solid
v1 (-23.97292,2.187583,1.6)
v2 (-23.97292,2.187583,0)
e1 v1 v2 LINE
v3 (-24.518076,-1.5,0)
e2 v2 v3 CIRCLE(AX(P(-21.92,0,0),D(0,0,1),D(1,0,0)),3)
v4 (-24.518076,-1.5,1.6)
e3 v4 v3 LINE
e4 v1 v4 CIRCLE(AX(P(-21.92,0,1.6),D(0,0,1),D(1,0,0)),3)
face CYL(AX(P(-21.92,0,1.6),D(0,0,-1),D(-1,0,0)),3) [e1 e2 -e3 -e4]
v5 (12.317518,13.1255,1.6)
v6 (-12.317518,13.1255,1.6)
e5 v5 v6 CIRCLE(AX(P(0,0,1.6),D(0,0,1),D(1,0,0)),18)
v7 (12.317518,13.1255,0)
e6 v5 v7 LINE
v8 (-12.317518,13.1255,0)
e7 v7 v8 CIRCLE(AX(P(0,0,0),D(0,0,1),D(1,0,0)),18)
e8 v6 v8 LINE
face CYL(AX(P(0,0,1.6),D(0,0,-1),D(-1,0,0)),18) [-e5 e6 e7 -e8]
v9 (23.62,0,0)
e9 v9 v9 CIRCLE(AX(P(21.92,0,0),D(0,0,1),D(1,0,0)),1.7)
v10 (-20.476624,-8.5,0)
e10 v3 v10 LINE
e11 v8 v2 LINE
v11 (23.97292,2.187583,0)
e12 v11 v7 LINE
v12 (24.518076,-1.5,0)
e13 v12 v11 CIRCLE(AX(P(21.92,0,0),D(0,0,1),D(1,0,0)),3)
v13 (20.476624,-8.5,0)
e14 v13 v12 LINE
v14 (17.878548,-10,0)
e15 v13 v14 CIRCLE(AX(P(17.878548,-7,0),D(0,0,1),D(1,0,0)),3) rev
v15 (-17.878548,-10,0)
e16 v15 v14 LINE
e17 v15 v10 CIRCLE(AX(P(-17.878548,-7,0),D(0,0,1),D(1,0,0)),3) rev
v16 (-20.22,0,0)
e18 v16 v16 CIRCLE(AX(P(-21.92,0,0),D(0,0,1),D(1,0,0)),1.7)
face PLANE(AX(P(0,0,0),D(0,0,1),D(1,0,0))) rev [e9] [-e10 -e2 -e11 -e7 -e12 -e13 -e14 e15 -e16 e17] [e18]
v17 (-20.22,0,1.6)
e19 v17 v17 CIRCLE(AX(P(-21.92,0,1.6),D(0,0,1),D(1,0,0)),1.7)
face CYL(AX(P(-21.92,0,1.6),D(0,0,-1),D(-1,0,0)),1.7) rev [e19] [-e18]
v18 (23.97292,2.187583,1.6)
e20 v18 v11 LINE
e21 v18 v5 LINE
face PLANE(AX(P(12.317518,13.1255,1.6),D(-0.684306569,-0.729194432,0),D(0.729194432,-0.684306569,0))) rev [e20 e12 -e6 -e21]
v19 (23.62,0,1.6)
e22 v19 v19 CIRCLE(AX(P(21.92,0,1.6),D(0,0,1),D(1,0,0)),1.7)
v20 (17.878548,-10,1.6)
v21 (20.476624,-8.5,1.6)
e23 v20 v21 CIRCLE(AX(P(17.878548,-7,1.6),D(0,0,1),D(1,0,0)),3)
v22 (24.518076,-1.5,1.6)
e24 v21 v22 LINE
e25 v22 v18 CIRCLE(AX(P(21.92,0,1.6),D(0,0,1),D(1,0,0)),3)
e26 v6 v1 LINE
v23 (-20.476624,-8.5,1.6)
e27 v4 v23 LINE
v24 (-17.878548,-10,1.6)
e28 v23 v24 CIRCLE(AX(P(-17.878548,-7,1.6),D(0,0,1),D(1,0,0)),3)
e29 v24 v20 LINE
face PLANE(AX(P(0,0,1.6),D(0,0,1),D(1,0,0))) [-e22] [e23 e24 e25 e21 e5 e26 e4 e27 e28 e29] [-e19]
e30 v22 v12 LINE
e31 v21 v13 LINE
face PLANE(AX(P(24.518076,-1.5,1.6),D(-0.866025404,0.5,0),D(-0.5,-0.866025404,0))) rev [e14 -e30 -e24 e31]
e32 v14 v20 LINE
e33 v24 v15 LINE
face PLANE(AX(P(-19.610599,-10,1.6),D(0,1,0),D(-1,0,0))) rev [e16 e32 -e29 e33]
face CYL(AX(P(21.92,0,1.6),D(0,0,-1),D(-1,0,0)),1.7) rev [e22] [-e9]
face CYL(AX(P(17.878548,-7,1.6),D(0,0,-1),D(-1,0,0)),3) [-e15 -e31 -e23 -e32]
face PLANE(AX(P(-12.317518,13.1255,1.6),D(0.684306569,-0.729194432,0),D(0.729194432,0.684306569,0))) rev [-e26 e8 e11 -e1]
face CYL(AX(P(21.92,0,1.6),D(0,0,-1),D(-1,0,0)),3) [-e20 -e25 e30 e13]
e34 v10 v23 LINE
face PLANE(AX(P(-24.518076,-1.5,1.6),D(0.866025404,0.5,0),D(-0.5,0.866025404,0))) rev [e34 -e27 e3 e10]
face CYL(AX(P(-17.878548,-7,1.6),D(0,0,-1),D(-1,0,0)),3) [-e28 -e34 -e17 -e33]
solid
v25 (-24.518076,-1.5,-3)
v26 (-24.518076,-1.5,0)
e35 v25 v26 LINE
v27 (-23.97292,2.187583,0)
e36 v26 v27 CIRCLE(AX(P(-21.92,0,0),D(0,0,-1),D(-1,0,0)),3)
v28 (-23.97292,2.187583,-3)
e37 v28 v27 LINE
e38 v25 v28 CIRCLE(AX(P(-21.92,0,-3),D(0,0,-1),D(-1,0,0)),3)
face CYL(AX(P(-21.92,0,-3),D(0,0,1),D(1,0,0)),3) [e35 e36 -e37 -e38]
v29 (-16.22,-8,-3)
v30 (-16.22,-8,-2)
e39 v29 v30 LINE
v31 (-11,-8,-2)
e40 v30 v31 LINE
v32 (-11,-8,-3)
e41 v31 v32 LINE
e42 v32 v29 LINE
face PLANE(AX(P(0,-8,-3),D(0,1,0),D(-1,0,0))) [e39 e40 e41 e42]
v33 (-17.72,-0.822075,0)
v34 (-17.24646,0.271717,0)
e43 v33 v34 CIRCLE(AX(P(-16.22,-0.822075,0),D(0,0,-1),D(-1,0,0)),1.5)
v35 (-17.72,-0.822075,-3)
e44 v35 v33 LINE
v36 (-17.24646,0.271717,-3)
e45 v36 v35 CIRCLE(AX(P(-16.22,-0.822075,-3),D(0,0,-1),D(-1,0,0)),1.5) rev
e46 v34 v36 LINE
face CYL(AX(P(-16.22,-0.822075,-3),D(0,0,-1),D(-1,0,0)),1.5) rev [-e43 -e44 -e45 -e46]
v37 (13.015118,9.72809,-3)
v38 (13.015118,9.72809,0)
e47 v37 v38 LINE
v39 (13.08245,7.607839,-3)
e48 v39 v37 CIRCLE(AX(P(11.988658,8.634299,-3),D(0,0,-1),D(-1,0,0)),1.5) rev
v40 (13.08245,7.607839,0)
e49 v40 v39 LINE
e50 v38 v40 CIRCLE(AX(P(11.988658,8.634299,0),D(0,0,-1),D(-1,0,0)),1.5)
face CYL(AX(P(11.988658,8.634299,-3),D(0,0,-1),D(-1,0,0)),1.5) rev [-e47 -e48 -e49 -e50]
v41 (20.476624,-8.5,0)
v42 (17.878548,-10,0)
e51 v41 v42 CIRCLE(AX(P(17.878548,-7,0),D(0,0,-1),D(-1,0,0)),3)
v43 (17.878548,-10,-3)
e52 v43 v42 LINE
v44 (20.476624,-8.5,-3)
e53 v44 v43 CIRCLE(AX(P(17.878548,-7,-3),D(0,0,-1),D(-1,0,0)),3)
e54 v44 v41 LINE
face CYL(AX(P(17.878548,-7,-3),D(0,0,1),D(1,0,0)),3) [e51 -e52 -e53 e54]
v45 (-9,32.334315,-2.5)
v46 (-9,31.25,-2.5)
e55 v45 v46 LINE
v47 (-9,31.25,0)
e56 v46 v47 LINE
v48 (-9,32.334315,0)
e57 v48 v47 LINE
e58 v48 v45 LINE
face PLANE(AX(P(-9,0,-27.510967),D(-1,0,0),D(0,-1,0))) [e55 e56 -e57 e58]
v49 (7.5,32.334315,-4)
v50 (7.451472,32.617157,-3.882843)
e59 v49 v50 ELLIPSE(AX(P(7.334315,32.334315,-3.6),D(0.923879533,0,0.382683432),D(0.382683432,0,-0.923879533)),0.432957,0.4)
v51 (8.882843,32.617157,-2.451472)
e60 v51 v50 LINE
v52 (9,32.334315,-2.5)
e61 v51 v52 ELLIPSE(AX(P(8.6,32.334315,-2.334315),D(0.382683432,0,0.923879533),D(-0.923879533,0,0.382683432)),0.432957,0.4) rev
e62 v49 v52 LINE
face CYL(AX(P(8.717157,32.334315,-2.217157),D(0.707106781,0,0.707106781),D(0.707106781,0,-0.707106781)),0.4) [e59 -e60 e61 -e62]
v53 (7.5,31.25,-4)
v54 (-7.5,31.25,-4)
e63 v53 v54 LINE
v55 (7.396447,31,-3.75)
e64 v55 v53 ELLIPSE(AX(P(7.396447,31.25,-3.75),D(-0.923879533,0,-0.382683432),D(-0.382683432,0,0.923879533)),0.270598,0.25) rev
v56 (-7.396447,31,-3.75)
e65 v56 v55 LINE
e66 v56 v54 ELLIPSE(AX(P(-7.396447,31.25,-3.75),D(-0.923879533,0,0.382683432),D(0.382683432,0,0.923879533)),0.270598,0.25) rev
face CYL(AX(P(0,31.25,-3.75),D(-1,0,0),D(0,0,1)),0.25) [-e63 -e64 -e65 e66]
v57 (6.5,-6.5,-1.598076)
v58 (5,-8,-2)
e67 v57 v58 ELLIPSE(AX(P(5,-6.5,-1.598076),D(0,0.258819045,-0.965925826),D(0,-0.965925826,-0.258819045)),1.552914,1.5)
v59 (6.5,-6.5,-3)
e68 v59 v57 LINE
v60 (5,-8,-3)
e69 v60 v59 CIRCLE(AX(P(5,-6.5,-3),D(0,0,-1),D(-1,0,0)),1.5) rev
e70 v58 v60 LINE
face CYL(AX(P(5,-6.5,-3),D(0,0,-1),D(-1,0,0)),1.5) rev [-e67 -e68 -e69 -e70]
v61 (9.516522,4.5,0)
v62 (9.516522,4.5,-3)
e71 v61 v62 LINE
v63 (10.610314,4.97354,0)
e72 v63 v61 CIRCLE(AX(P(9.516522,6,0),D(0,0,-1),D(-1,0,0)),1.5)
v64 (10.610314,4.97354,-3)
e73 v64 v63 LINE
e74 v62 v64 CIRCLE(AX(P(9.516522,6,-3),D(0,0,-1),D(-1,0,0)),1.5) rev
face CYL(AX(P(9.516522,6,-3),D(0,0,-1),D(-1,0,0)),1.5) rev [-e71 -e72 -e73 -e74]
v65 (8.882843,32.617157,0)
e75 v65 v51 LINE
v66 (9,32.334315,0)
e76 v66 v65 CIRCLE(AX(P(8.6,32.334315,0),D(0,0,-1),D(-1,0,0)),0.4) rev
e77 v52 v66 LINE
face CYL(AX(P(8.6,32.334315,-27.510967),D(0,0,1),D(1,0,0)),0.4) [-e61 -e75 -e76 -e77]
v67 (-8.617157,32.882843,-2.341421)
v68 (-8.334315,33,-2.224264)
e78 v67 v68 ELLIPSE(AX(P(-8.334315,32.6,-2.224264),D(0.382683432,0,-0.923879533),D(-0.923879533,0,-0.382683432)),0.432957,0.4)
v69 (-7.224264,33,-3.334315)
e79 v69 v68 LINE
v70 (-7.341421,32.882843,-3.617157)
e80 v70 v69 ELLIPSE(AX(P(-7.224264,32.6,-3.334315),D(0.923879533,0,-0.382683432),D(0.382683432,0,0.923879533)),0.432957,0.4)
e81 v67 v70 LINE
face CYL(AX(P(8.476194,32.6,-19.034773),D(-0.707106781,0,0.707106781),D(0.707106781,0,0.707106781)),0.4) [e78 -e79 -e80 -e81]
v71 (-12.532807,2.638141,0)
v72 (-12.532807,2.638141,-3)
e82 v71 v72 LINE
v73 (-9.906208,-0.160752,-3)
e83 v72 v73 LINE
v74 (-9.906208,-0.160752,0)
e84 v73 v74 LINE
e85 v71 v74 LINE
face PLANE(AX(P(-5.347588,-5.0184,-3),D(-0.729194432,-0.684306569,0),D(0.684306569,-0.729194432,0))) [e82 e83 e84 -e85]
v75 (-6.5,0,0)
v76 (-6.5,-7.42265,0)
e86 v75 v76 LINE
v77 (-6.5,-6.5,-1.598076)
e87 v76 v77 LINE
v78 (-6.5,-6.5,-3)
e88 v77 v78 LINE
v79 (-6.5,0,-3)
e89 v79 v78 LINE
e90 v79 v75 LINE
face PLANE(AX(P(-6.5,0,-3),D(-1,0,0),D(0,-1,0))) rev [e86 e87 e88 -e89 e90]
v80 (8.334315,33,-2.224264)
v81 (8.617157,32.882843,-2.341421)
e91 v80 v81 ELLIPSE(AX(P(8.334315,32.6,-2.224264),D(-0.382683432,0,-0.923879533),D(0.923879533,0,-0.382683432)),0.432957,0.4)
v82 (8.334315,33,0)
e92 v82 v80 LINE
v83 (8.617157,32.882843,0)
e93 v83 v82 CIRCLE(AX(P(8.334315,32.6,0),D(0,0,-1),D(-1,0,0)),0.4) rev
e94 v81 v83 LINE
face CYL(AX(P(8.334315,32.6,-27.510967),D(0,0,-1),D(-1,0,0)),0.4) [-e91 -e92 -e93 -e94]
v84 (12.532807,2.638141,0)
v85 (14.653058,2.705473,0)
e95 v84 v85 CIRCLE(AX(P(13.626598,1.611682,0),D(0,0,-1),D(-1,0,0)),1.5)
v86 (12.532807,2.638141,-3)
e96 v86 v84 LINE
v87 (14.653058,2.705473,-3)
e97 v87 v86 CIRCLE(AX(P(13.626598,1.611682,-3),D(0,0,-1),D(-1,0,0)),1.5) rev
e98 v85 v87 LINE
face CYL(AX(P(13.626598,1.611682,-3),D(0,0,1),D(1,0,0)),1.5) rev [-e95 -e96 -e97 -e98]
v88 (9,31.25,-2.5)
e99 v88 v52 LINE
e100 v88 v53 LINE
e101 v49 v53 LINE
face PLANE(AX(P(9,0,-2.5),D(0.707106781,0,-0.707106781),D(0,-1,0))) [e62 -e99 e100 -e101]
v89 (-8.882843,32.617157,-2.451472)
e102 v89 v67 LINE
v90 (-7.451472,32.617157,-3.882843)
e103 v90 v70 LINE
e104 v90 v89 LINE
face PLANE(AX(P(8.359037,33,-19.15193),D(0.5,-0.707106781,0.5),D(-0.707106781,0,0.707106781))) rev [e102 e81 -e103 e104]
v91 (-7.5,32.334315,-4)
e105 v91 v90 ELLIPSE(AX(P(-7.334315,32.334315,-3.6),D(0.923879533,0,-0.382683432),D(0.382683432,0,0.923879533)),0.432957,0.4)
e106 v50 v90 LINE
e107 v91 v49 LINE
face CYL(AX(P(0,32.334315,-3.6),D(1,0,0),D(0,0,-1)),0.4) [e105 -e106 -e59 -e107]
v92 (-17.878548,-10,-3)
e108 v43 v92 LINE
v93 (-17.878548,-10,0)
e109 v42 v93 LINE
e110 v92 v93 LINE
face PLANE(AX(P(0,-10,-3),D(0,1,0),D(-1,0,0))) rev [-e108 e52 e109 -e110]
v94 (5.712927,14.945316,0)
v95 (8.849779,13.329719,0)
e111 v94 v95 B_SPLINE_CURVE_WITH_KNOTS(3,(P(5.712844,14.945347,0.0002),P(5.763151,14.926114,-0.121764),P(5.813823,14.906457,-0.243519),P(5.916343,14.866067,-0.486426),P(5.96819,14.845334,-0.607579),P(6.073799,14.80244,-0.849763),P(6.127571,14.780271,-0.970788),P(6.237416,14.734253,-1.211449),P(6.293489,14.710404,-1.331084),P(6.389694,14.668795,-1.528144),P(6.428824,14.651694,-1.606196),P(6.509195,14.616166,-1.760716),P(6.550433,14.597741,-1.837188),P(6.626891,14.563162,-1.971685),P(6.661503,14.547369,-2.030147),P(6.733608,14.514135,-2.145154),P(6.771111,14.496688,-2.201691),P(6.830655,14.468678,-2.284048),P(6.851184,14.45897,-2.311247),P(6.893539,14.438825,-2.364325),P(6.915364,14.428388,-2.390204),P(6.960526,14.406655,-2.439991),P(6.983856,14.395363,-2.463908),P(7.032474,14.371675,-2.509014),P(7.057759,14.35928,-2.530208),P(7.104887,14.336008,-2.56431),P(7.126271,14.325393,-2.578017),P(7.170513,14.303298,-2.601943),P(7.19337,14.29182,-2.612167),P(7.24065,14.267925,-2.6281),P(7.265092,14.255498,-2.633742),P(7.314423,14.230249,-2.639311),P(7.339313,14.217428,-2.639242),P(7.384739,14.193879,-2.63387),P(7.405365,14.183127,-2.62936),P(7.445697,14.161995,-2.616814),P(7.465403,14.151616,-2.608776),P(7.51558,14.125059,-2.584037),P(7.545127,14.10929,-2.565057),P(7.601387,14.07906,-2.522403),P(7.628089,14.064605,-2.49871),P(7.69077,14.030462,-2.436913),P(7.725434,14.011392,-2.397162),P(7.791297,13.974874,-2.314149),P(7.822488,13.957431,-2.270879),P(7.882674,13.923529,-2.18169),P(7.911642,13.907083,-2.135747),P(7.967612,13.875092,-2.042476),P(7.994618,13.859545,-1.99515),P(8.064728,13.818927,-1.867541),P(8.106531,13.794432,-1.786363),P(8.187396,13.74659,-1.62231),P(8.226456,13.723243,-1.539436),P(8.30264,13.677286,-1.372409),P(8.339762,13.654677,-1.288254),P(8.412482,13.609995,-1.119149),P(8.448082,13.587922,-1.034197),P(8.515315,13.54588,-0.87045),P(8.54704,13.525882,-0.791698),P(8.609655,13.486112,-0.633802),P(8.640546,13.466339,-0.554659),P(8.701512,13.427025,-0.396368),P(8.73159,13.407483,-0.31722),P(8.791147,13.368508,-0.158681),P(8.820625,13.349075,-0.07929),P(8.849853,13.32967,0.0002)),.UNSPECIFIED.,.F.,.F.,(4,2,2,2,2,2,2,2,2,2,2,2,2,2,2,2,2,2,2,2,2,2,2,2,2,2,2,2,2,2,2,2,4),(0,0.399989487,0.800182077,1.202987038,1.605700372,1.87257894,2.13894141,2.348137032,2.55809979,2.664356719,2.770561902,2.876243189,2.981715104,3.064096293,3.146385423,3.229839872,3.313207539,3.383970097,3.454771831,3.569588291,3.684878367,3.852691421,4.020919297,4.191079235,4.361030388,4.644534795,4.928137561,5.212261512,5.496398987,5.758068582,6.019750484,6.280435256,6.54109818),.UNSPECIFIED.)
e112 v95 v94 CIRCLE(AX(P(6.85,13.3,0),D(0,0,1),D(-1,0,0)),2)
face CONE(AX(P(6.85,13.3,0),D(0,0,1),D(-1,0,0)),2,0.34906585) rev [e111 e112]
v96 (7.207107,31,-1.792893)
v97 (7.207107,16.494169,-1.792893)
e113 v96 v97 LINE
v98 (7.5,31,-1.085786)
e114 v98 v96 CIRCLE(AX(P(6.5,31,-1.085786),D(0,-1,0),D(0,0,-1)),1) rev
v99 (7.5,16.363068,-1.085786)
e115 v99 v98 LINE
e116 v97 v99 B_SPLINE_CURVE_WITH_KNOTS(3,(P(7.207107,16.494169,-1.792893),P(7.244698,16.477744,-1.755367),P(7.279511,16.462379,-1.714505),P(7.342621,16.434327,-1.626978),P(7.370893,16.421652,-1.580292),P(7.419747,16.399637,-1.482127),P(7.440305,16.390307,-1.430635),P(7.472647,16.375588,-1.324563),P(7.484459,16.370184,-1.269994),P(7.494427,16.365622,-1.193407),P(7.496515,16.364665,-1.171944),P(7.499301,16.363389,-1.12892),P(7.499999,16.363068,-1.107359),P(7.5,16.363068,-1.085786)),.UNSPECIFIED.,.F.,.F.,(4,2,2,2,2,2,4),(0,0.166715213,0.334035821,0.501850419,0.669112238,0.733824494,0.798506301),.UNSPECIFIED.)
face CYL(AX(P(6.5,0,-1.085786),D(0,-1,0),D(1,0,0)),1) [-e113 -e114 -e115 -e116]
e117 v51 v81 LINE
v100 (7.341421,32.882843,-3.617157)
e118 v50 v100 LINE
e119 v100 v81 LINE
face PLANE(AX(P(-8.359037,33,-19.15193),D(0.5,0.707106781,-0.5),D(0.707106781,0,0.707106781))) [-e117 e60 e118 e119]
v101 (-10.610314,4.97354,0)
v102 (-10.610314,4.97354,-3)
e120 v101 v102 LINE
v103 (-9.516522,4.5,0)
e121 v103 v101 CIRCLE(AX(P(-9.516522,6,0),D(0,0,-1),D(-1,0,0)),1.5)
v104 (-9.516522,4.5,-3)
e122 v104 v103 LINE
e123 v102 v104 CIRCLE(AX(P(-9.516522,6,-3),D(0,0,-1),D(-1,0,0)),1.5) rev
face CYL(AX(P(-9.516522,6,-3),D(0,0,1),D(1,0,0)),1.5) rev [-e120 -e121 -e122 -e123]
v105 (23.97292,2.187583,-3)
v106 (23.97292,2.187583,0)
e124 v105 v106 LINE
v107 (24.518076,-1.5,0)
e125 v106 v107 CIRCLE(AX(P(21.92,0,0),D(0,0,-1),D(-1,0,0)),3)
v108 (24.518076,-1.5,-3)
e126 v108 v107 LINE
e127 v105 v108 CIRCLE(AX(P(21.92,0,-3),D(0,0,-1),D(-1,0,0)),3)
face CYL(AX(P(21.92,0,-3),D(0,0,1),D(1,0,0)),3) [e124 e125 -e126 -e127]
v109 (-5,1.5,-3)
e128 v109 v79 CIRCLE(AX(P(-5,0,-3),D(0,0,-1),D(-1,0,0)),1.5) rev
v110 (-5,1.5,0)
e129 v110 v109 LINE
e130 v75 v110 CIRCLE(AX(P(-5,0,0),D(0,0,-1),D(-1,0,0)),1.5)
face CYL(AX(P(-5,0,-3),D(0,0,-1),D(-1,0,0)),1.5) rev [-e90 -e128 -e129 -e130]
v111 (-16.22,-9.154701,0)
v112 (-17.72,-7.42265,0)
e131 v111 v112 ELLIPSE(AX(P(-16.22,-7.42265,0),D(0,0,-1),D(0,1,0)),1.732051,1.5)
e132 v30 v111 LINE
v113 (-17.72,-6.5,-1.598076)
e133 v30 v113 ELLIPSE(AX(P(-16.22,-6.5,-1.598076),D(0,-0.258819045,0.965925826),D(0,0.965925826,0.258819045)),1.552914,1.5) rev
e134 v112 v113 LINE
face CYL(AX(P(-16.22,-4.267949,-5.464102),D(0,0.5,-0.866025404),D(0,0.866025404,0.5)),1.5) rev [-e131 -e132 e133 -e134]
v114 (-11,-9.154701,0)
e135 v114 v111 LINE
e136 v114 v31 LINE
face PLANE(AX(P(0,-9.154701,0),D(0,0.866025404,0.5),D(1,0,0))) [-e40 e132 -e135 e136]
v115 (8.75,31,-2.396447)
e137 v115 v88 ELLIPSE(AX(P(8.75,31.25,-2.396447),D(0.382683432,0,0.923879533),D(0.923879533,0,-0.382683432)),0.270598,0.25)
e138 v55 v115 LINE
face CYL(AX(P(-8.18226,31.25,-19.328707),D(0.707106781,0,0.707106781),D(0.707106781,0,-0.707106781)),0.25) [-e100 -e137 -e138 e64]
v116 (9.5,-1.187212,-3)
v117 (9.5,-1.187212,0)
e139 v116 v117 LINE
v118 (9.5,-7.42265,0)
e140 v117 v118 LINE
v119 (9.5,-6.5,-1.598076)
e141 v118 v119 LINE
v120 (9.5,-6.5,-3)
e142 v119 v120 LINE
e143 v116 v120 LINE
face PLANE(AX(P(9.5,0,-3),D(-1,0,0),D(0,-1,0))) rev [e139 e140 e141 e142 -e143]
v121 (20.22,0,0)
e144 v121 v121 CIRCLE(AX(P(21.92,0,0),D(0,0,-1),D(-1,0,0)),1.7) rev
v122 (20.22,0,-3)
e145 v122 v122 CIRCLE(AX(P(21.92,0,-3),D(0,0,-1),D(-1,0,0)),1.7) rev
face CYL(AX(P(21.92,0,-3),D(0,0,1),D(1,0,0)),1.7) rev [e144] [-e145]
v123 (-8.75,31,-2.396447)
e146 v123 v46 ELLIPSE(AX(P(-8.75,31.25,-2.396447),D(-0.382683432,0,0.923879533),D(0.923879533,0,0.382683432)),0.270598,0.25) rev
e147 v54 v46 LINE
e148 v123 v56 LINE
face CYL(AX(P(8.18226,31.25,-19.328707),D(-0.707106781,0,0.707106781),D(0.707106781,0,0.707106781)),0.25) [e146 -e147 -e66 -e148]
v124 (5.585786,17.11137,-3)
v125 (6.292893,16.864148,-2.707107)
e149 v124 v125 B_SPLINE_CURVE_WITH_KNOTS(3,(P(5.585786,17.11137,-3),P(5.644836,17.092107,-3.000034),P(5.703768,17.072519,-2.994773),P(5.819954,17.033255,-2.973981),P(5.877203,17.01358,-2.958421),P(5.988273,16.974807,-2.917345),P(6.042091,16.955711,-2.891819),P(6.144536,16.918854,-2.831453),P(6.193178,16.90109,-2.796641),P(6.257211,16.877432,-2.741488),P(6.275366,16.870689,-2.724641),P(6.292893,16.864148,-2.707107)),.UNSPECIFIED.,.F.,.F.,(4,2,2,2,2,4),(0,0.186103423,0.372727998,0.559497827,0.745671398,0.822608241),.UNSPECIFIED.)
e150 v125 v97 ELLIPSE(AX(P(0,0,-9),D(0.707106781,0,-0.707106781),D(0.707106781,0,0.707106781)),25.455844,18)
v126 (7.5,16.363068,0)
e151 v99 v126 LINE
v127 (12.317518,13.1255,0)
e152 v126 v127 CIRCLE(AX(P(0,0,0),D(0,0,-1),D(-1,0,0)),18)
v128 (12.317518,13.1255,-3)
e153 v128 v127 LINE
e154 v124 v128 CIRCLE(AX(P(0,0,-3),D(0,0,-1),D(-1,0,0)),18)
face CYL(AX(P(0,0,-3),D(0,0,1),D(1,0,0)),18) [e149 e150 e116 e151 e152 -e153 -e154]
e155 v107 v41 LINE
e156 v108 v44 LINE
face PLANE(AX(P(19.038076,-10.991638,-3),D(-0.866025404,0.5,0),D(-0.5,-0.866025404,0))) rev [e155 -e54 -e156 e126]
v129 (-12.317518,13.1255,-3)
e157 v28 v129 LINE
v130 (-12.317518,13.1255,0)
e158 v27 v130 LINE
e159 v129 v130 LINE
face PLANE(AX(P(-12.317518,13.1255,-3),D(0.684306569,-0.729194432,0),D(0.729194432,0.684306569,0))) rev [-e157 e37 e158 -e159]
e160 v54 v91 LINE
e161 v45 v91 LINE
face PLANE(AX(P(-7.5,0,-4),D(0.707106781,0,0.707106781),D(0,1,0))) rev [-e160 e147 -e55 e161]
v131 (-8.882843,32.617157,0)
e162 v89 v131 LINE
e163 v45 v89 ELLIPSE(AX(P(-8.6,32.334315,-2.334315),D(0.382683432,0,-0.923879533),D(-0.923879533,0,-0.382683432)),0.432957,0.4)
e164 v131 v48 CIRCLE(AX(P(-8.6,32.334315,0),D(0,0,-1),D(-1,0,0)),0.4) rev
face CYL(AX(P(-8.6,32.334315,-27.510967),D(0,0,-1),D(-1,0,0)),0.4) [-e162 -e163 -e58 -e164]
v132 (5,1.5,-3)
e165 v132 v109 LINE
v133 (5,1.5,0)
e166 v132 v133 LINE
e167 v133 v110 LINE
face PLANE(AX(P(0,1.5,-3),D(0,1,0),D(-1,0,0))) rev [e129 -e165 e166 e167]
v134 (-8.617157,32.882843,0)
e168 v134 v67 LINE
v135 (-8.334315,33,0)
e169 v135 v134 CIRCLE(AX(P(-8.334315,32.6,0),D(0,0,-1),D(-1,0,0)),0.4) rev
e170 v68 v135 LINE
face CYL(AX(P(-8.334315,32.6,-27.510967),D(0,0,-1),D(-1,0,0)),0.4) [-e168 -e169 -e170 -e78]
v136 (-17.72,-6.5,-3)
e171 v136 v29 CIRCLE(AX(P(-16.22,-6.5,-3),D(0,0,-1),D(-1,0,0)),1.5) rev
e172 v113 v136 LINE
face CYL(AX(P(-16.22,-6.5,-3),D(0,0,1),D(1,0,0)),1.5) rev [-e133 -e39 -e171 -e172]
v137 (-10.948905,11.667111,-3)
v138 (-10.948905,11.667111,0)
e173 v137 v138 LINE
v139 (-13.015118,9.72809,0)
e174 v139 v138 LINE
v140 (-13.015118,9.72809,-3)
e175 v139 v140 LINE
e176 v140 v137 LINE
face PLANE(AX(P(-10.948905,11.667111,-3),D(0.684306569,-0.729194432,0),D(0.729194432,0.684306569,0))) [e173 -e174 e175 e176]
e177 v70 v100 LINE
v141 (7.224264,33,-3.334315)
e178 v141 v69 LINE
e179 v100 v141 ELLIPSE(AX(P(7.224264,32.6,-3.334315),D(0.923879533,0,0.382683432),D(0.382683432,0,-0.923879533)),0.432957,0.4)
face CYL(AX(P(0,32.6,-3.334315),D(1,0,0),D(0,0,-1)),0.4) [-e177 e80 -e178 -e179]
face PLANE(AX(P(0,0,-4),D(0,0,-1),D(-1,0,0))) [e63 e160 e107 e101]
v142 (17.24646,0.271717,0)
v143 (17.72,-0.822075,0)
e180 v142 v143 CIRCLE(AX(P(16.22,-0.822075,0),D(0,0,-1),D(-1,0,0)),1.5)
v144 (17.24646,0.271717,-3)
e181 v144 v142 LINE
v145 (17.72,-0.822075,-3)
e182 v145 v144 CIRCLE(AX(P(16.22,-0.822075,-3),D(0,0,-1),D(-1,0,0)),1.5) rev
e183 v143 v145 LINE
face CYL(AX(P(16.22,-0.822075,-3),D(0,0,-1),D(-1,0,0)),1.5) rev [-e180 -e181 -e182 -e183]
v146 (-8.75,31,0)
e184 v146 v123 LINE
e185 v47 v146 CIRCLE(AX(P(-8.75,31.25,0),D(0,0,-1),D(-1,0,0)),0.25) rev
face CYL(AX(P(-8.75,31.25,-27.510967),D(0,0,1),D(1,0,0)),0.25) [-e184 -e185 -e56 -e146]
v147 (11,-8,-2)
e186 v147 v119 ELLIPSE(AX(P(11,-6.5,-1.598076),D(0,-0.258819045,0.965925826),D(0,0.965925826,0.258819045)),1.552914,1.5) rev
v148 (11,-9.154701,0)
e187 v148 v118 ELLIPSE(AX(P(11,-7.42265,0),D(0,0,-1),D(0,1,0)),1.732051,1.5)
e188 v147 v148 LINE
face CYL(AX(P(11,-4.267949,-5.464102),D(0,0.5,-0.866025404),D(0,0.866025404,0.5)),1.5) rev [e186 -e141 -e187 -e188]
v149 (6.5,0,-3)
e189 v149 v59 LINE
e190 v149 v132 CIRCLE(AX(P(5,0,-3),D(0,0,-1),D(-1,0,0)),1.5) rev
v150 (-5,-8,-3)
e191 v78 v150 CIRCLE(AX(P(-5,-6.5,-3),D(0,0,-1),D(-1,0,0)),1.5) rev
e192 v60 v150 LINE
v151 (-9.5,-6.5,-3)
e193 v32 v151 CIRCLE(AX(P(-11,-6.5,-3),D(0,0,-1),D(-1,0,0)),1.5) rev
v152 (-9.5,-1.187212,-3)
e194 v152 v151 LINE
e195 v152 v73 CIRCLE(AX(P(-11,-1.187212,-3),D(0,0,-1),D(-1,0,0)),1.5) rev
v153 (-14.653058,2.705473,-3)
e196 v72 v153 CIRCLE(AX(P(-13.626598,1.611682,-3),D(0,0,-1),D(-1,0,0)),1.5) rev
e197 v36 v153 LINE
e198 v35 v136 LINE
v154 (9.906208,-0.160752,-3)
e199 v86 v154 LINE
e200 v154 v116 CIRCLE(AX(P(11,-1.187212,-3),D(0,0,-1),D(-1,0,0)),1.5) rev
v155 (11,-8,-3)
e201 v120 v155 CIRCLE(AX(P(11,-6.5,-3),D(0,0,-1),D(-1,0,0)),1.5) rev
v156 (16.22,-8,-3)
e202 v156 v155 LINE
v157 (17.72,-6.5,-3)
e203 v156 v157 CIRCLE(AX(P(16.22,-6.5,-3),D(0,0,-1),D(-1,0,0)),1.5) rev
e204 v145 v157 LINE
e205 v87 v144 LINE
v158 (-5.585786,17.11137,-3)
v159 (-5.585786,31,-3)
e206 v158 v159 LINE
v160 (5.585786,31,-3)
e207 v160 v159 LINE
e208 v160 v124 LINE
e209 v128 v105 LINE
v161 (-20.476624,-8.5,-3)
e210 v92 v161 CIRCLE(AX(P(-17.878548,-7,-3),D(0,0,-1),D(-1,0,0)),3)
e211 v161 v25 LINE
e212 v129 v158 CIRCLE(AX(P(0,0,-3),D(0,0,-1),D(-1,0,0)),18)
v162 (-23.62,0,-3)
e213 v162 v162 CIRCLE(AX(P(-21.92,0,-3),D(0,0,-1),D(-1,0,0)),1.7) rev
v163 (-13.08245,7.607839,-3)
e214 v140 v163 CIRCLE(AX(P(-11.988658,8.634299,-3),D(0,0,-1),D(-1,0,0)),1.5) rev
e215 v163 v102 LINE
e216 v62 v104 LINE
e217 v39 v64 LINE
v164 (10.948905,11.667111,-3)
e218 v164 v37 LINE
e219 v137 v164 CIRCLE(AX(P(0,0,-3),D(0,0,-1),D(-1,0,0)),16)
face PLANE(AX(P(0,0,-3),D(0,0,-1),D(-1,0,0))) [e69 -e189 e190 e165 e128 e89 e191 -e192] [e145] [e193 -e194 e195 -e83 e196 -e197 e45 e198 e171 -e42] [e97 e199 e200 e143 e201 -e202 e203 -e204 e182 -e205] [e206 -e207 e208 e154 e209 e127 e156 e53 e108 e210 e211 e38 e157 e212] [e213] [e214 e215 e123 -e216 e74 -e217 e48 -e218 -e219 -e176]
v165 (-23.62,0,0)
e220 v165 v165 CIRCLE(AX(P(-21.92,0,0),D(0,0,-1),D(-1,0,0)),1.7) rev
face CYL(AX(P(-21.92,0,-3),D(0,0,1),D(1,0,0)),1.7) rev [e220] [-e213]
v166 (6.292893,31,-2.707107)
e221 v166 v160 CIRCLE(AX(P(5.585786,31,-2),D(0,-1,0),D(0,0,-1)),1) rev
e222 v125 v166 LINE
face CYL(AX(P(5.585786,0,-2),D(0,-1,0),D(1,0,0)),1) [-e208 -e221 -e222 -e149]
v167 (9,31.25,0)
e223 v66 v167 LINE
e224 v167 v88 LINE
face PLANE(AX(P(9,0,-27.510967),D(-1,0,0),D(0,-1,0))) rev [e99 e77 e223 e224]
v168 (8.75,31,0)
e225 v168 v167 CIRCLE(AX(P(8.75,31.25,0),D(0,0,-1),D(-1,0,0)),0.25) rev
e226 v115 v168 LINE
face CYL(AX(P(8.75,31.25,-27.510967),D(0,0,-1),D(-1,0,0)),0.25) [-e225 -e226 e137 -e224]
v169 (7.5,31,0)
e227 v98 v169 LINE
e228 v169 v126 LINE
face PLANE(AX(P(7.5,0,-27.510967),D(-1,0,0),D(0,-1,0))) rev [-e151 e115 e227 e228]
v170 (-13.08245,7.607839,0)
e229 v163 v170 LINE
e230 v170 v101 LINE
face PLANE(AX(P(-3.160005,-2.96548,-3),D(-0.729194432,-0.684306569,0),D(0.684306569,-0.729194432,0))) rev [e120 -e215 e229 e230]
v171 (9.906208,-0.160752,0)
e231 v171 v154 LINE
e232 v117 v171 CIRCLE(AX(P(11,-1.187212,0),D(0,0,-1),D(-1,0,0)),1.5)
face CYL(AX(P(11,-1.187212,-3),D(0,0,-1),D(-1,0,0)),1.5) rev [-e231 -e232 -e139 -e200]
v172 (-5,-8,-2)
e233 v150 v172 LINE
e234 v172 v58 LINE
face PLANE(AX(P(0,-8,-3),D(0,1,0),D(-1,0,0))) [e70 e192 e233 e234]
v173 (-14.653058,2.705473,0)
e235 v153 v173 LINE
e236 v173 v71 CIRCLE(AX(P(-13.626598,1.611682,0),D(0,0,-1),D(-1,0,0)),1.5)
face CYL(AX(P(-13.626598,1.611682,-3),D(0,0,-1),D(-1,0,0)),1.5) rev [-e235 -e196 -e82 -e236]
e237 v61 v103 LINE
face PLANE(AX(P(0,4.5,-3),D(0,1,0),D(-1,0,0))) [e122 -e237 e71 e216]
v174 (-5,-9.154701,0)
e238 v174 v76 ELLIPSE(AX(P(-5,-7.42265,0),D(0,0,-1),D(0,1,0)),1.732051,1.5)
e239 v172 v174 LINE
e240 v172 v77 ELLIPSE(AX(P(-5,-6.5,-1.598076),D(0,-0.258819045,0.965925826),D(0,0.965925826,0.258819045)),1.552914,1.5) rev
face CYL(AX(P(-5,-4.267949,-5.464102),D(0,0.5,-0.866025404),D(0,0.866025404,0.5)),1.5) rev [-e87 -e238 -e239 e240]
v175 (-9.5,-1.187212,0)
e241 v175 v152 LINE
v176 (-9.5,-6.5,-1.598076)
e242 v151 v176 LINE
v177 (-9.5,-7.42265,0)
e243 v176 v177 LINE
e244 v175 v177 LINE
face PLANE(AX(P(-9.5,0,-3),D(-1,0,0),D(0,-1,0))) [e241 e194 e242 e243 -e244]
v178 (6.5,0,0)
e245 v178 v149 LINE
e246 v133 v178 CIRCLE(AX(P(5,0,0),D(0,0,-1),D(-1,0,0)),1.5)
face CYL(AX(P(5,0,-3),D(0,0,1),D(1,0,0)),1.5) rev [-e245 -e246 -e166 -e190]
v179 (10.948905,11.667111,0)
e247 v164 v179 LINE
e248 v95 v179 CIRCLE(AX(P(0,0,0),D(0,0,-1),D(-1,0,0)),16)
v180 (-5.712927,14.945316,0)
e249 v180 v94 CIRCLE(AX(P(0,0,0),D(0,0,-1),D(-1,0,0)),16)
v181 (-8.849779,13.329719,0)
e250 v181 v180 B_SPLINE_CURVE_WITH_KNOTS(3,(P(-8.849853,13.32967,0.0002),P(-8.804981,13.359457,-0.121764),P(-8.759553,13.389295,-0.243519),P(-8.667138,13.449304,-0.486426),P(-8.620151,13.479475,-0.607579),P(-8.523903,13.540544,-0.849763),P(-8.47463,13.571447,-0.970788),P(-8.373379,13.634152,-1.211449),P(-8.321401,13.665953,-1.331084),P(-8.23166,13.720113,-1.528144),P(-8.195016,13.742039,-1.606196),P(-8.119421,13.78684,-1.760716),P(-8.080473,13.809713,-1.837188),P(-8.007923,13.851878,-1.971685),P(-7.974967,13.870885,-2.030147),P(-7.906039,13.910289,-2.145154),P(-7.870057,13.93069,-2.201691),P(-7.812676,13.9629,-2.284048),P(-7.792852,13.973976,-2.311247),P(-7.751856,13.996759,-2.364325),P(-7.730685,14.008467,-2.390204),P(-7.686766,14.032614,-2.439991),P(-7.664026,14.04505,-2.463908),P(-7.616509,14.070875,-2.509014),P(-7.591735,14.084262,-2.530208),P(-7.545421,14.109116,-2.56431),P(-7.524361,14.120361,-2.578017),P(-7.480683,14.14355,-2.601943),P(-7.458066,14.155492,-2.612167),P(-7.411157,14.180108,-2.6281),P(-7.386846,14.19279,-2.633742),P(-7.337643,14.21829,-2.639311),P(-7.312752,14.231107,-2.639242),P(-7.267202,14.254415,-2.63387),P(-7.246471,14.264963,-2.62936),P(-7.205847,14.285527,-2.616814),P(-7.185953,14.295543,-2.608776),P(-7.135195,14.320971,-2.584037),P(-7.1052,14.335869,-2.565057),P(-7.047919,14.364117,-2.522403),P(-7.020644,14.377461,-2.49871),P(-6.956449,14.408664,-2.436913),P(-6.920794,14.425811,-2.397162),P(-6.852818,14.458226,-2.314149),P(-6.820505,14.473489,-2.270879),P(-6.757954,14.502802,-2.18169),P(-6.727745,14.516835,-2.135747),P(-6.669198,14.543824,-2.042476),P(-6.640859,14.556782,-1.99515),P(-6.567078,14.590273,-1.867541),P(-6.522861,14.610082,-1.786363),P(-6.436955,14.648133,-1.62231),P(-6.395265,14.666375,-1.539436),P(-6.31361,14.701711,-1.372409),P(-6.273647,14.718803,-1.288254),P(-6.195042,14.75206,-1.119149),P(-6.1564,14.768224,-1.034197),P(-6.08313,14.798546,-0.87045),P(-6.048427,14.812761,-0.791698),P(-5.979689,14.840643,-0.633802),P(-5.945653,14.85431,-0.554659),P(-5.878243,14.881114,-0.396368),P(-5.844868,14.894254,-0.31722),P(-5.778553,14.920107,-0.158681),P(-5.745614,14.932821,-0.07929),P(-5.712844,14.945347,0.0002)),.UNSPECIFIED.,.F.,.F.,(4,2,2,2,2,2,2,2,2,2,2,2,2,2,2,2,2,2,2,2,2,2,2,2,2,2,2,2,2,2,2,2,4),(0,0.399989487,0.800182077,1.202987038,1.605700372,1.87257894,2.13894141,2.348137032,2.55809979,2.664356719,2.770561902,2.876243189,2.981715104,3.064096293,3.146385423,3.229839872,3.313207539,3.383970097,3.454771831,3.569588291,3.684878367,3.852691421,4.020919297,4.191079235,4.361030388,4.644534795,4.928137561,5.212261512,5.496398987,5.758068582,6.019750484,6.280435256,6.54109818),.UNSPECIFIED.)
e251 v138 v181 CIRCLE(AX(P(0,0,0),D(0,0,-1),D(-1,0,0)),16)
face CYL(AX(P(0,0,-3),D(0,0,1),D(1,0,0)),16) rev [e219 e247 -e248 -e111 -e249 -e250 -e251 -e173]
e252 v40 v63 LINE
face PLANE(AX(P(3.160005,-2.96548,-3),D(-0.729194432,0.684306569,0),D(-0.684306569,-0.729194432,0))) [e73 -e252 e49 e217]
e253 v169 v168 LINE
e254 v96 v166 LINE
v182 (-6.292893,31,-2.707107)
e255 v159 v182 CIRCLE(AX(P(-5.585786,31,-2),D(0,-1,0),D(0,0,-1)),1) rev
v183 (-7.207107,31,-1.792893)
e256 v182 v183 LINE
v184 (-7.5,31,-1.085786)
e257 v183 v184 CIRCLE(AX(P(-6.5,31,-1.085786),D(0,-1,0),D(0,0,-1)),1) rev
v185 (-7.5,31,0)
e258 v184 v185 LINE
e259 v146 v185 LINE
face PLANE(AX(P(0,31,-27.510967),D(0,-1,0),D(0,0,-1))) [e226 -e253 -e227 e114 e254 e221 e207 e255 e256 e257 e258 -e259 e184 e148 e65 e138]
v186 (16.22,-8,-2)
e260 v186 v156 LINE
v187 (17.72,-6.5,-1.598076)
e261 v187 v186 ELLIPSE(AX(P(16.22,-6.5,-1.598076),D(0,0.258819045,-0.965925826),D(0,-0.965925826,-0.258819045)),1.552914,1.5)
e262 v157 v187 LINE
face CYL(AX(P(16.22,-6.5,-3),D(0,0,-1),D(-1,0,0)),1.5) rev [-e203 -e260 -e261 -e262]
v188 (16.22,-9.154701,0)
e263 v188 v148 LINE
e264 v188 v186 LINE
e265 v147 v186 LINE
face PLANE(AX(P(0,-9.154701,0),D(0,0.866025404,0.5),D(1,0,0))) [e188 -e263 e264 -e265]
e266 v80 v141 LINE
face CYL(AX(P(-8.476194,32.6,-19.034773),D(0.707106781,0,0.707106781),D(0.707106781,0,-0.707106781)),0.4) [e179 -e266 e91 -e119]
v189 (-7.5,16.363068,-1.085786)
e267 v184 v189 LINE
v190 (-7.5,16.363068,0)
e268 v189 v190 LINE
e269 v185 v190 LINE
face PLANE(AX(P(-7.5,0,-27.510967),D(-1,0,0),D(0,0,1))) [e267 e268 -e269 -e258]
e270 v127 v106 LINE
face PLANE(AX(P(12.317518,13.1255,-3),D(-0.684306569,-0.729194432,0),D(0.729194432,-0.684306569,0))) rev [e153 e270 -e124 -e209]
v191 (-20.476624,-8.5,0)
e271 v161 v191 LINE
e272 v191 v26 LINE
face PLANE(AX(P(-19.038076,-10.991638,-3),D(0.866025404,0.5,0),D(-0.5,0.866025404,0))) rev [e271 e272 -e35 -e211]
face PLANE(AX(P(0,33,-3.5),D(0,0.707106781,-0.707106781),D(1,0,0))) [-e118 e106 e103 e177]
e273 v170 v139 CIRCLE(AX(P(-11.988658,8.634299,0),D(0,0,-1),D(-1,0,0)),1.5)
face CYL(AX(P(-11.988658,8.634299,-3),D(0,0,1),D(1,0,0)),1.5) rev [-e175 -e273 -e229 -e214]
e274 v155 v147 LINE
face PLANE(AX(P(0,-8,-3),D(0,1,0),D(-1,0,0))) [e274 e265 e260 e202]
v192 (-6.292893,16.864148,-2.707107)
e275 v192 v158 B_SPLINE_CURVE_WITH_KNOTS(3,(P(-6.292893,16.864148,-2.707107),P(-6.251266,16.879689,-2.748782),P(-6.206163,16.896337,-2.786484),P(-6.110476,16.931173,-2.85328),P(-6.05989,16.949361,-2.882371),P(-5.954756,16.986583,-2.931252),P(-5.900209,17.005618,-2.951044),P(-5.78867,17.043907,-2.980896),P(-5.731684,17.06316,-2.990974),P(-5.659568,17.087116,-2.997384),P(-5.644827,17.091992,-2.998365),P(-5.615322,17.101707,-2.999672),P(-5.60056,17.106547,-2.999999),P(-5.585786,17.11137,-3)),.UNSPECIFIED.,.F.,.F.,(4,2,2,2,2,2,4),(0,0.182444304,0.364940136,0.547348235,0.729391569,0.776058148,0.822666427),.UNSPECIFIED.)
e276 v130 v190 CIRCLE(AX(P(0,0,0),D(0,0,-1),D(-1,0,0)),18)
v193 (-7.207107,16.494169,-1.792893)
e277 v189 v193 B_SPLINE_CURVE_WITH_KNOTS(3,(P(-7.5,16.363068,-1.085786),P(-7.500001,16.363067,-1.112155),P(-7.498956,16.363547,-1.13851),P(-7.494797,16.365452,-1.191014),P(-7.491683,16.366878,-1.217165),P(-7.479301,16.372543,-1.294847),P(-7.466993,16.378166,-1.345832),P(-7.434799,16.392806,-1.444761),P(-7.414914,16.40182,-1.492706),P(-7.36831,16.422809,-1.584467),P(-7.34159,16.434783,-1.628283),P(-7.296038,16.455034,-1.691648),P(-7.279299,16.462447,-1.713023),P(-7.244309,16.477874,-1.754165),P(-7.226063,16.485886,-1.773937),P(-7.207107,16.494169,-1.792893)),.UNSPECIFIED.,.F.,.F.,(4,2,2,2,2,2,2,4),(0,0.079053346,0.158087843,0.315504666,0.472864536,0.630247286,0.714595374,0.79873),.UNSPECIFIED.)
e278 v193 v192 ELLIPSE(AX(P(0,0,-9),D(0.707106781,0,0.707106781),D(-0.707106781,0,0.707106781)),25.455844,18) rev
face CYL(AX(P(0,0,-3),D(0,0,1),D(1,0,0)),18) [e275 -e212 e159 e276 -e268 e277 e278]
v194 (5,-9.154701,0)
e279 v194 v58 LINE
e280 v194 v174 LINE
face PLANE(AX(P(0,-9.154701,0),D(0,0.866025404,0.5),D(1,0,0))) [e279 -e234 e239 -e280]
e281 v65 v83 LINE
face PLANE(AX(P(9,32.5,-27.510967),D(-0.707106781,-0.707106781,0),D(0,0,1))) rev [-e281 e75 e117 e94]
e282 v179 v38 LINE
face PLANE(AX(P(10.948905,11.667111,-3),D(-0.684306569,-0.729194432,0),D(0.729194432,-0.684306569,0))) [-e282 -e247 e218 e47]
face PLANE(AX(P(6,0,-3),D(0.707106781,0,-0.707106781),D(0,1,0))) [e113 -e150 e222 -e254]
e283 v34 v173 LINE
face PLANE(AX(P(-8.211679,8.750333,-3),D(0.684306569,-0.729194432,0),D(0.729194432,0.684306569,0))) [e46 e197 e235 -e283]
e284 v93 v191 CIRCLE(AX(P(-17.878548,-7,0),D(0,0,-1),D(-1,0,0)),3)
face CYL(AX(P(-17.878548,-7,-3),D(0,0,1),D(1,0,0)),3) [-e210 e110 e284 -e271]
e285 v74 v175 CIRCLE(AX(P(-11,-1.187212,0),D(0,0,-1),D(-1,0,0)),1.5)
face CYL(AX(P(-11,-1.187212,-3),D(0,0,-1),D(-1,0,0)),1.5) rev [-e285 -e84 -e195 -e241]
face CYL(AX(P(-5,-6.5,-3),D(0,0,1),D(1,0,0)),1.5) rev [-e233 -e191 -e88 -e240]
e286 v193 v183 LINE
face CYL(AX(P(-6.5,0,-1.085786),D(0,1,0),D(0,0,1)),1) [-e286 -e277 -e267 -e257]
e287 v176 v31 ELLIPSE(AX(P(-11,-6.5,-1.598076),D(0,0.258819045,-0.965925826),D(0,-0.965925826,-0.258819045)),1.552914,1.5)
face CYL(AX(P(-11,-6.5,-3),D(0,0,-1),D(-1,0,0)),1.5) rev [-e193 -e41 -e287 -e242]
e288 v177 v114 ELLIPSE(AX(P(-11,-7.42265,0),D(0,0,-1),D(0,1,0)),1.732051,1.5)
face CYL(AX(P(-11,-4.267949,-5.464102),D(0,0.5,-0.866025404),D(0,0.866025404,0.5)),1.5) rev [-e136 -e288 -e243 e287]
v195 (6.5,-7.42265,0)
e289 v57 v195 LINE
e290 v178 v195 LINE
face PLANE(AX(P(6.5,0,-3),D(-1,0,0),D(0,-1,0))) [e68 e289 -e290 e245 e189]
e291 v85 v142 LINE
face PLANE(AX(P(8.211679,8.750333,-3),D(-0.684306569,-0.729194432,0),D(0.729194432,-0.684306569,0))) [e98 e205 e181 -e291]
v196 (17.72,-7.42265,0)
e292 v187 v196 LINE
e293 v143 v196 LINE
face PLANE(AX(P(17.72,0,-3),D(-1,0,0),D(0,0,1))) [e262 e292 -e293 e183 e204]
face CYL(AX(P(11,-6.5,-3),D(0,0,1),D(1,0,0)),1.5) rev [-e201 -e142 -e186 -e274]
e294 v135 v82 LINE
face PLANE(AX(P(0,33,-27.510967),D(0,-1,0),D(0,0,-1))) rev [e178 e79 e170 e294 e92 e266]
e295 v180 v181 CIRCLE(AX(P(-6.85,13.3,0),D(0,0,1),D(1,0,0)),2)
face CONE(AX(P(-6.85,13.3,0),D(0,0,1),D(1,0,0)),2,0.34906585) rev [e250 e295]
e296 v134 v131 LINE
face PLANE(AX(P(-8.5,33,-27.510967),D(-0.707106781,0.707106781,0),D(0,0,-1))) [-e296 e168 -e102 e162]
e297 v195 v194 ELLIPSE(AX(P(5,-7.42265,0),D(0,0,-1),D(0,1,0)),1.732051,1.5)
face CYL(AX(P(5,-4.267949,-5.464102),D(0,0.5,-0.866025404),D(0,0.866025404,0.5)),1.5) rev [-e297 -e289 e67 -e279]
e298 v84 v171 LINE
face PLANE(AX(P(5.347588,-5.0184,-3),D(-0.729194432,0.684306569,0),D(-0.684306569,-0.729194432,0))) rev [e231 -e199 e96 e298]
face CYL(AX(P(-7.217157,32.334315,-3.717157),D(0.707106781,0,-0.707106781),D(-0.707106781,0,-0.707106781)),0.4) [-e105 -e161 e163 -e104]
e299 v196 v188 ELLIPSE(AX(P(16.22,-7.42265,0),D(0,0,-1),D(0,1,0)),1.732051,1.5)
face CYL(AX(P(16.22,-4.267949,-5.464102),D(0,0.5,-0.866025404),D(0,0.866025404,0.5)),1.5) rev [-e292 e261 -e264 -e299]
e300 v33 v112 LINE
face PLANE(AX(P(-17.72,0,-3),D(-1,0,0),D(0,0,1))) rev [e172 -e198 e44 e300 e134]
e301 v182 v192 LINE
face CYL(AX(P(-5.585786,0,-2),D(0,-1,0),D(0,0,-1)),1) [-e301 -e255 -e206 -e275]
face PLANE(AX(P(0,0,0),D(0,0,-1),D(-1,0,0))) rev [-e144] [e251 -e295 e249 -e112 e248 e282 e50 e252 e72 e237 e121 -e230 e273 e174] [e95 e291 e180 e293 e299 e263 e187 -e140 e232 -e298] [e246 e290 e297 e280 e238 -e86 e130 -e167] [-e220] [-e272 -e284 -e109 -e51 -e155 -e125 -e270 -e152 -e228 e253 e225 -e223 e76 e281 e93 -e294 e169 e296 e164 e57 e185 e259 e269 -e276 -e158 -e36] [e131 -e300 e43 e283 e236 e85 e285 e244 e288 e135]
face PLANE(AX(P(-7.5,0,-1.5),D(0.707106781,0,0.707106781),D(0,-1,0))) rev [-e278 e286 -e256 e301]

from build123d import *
from OCP.BRepFilletAPI import BRepFilletAPI_MakeChamfer

# Parameters (mm, degrees)
SKETCH1_R           = 1.7
BOSS_EXTRUDE1_DEPTH = 1.6
FILLET3_R           = 3
SKETCH2_R           = 1.7
SKETCH2_W           = 13
SKETCH2_H           = 9.5
BOSS_EXTRUDE2_DEPTH = 3
CHAMFER1_SIZE       = 2
CHAMFER1_SIZE2      = 1.154700538
MOVE_START          = -3
MOVE_FACE2_DEPTH    = 3
MOVE_FACE3_DEPTH    = 3
FILLET2_R           = 1.5
BOSS_EXTRUDE3_START = -3
BOSS_EXTRUDE3_DEPTH = 3
BOSS_EXTRUDE4_START = -3
BOSS_EXTRUDE4_DEPTH = 1
CHAMFER6_SIZE       = 1.5
CHAMFER3_SIZE       = 0.5
FILLET6_R           = 0.4
CHAMFER5_SIZE       = 1.5
FILLET7_R           = 1
FILLET8_R           = 0.25


# Read off the part's stored shape, not the designer's step: Move Face2, Move Face3
with BuildPart() as part:
    # Sketch1 → Boss-Extrude1 (new body)
    with BuildSketch(Plane.XY):
        with BuildLine():
            Line((-12.317518248, 13.12549977), (-23.972919708, 2.187583295))
            ThreePointArc((-23.972919708, 2.187583295), (-24.887744666, 0.438738647), (-24.518076211, -1.5))
            Line((-24.518076211, -1.5), (-19.610598923, -10))
            Line((-19.610598923, -10), (19.610598923, -10))
            Line((19.610598923, -10), (24.518076211, -1.5))
            ThreePointArc((24.518076211, -1.5), (24.887744666, 0.438738647), (23.972919708, 2.187583295))
            Line((23.972919708, 2.187583295), (12.317518248, 13.12549977))
            ThreePointArc((12.317518248, 13.12549977), (0, 18), (-12.317518248, 13.12549977))
        make_face()
        with Locations((-21.92, 0)):
            Circle(SKETCH1_R, mode=Mode.SUBTRACT)
        with Locations((21.92, 0)):
            Circle(SKETCH1_R, mode=Mode.SUBTRACT)
    extrude(amount=BOSS_EXTRUDE1_DEPTH)

    # Fillet3
    fillet3_edges = [part.edges().sort_by_distance(p)[0] for p in [
        (19.610598923, -10, 0.8),
        (-19.610598923, -10, 0.8),
    ]]
    fillet(fillet3_edges, radius=FILLET3_R)


with BuildPart() as body_2:
    # Sketch2 → Boss-Extrude2 (new body)
    with BuildSketch(Plane(origin=(0, 0, 0), x_dir=(-1, 0, 0), z_dir=(0, 0, -1))):
        with BuildLine():
            ThreePointArc((-20.476624327, -8.5), (-19.378548116, -9.598076211), (-17.878548116, -10))
            Line((-17.878548116, -10), (17.878548116, -10))
            ThreePointArc((17.878548116, -10), (19.378548116, -9.598076211), (20.476624327, -8.5))
            Line((20.476624327, -8.5), (24.518076211, -1.5))
            ThreePointArc((24.518076211, -1.5), (24.887744666, 0.438738647), (23.972919708, 2.187583295))
            Line((23.972919708, 2.187583295), (12.317518248, 13.12549977))
            ThreePointArc((12.317518248, 13.12549977), (0, 18), (-12.317518248, 13.12549977))
            Line((-12.317518248, 13.12549977), (-23.972919708, 2.187583295))
            ThreePointArc((-23.972919708, 2.187583295), (-24.887744666, 0.438738647), (-24.518076211, -1.5))
            Line((-24.518076211, -1.5), (-20.476624327, -8.5))
        make_face()
        with BuildLine():
            Line((10.165923783, 4.5), (-10.165923783, 4.5))
            Line((-10.165923783, 4.5), (-14.108909615, 8.701630441))
            Line((-14.108909615, 8.701630441), (-10.948905109, 11.667110906))
            ThreePointArc((-10.948905109, 11.667110906), (0, 16), (10.948905109, 11.667110906))
            Line((10.948905109, 11.667110906), (14.108909615, 8.701630441))
            Line((14.108909615, 8.701630441), (10.165923783, 4.5))
        make_face(mode=Mode.SUBTRACT)
        with BuildLine():
            Line((-16.29649291, 6.648710733), (-9.5, -0.593605806))
            Line((-9.5, -0.593605806), (-9.5, -8))
            Line((-9.5, -8), (-17.72, -8))
            Line((-17.72, -8), (-17.72, 0))
            ThreePointArc((-17.72, 0), (-18.228185683, 2.002625039), (-19.62976526, 3.520628472))
            Line((-19.62976526, 3.520628472), (-16.29649291, 6.648710733))
        make_face(mode=Mode.SUBTRACT)
        with BuildLine():
            Line((17.72, -8), (9.5, -8))
            Line((9.5, -8), (9.5, -0.593605806))
            Line((9.5, -0.593605806), (16.29649291, 6.648710733))
            Line((16.29649291, 6.648710733), (19.62976526, 3.520628472))
            ThreePointArc((19.62976526, 3.520628472), (18.228185683, 2.002625039), (17.72, 0))
            Line((17.72, 0), (17.72, -8))
        make_face(mode=Mode.SUBTRACT)
        with Locations((21.92, 0)):
            Circle(SKETCH2_R, mode=Mode.SUBTRACT)
        with Locations((0, -3.25)):
            Rectangle(SKETCH2_W, SKETCH2_H, mode=Mode.SUBTRACT)
        with Locations((-21.92, 0)):
            Circle(SKETCH2_R, mode=Mode.SUBTRACT)
    extrude(amount=BOSS_EXTRUDE2_DEPTH)

    # Cut-Extrude1 cone 1 section (through the dimple's axis) → Cut-Extrude1 (revolve, cut)
    with BuildSketch(Plane(origin=(-6.85, 13.3, 0), x_dir=(0, -1, 0), z_dir=(1, 0, 0))):
        Polygon((0, 0), (2, 0), (0, 5.494954839), align=None)
    revolve(axis=Axis((-6.85, 13.3, 0), (0, 0, -1)), mode=Mode.SUBTRACT)

    # Cut-Extrude1 cone 2 section (through the dimple's axis) → Cut-Extrude1 cone 2 (revolve, cut)
    with BuildSketch(Plane(origin=(6.85, 13.3, 0), x_dir=(0, -1, 0), z_dir=(1, 0, 0))):
        Polygon((0, 0), (2, 0), (0, 5.494954839), align=None)
    revolve(axis=Axis((6.85, 13.3, 0), (0, 0, -1)), mode=Mode.SUBTRACT)

    # Chamfer1: one chamfer whose edges measure the first distance from different faces: ONE call of the kernel's chamfer builder (chamfer() names one face for all edges)
    chamfer1_edges_1 = [body_2.edges().sort_by_distance(p)[0] for p in [
        (-13.61, -8, 0),
    ]]
    chamfer1_side_1 = [body_2.faces().sort_by_distance(p)[0] for p in [
        (-13.61, -8, -1.5),
    ]]
    chamfer1_edges_2 = [body_2.edges().sort_by_distance(p)[0] for p in [
        (0, -8, 0),
    ]]
    chamfer1_side_2 = [body_2.faces().sort_by_distance(p)[0] for p in [
        (0, -8, -1.5),
    ]]
    chamfer1_edges_3 = [body_2.edges().sort_by_distance(p)[0] for p in [
        (13.61, -8, 0),
    ]]
    chamfer1_side_3 = [body_2.faces().sort_by_distance(p)[0] for p in [
        (13.61, -8, -1.5),
    ]]
    chamfer1 = BRepFilletAPI_MakeChamfer(body_2.part.solid().wrapped)
    for e in chamfer1_edges_1:
        chamfer1.Add(CHAMFER1_SIZE, CHAMFER1_SIZE2, e.wrapped, chamfer1_side_1[0].wrapped)  # the first distance lies on this face
    for e in chamfer1_edges_2:
        chamfer1.Add(CHAMFER1_SIZE, CHAMFER1_SIZE2, e.wrapped, chamfer1_side_2[0].wrapped)  # the first distance lies on this face
    for e in chamfer1_edges_3:
        chamfer1.Add(CHAMFER1_SIZE, CHAMFER1_SIZE2, e.wrapped, chamfer1_side_3[0].wrapped)  # the first distance lies on this face
    add(Compound.cast(chamfer1.Shape()), mode=Mode.REPLACE)

    # Move Face2 outline → Move Face2 (add)
    with BuildSketch(Plane.XY.offset(MOVE_START)):
        with BuildLine():
            Line((-17.72, 0), (-17.72, -0.1726733))
            Line((-17.72, -0.1726733), (-13.559266633, 3.731933007))
            Line((-13.559266633, 3.731933007), (-16.29649291, 6.648710733))
            Line((-16.29649291, 6.648710733), (-19.62976526, 3.520628472))
            ThreePointArc((-19.62976526, 3.520628472), (-18.228185683, 2.002625039), (-17.72, 0))
        make_face()
    extrude(amount=MOVE_FACE2_DEPTH)

    # Move Face3 outline → Move Face3 (add)
    with BuildSketch(Plane.XY.offset(MOVE_START)):
        with BuildLine():
            Line((16.29649291, 6.648710733), (13.559266633, 3.731933007))
            Line((13.559266633, 3.731933007), (17.72, -0.1726733))
            Line((17.72, -0.1726733), (17.72, 0))
            ThreePointArc((17.72, 0), (18.228185683, 2.002625039), (19.62976526, 3.520628472))
            Line((19.62976526, 3.520628472), (16.29649291, 6.648710733))
        make_face()
    extrude(amount=MOVE_FACE3_DEPTH)

    # Fillet2
    fillet2_edges = [body_2.edges().sort_by_distance(p)[0] for p in [
        (9.5, -8.577350269, -1),
        (17.72, -8.577350269, -1),
        (-6.5, -8.577350269, -1),
        (6.5, -8.577350269, -1),
        (-17.72, -8.577350269, -1),
        (-9.5, -8.577350269, -1),
        (-17.72, -0.1726733, -1.5),
        (17.72, -0.1726733, -1.5),
        (-10.165923783, 4.5, -1.5),
        (-14.108909615, 8.701630441, -1.5),
        (14.108909615, 8.701630441, -1.5),
        (10.165923783, 4.5, -1.5),
        (-13.559266633, 3.731933007, -1.5),
        (-9.5, -0.593605806, -1.5),
        (-9.5, -8, -2.5),
        (-17.72, -8, -2.5),
        (6.5, -8, -2.5),
        (-6.5, -8, -2.5),
        (-6.5, 1.5, -1.5),
        (6.5, 1.5, -1.5),
        (17.72, -8, -2.5),
        (9.5, -8, -2.5),
        (9.5, -0.593605806, -1.5),
        (13.559266633, 3.731933007, -1.5),
    ]]
    fillet(fillet2_edges, radius=FILLET2_R)

    # Sketch4 → Boss-Extrude3 (add)
    with BuildSketch(Plane.XY.offset(BOSS_EXTRUDE3_START)):
        with BuildLine():
            ThreePointArc((-7.5, 16.363068172), (0, 18), (7.5, 16.363068172))
            Line((7.5, 16.363068172), (7.5, 31))
            Line((7.5, 31), (9, 31))
            Line((9, 31), (9, 33))
            Line((9, 33), (-9, 33))
            Line((-9, 33), (-9, 31))
            Line((-9, 31), (-7.5, 31))
            Line((-7.5, 31), (-7.5, 16.363068172))
        make_face()
    extrude(amount=BOSS_EXTRUDE3_DEPTH)

    # Sketch4<3> → Boss-Extrude4 (add)
    with BuildSketch(Plane.XY.offset(BOSS_EXTRUDE4_START)):
        Polygon((-7.5, 31), (0, 31), (0, 33), (-9, 33), (-9, 31), align=None)
        Polygon((0, 33), (0, 31), (7.5, 31), (9, 31), (9, 33), align=None)
    extrude(amount=-BOSS_EXTRUDE4_DEPTH)

    # Chamfer6
    chamfer6_edges = [body_2.edges().sort_by_distance(p)[0] for p in [
        (9, 32, -4),
        (-9, 32, -4),
    ]]
    chamfer(chamfer6_edges, length=CHAMFER6_SIZE)

    # Chamfer3
    chamfer3_edges = [body_2.edges().sort_by_distance(p)[0] for p in [
        (0, 33, -4),
        (9, 33, -1.25),
        (-9, 33, -1.25),
        (8.25, 33, -3.25),
        (-8.25, 33, -3.25),
    ]]
    chamfer(chamfer3_edges, length=CHAMFER3_SIZE)

    # Fillet6
    fillet6_edges = [body_2.edges().sort_by_distance(p)[0] for p in [
        (9, 32.5, -1.25),
        (-8.5, 33, -1.146446609),
        (-7.896446609, 33, -2.896446609),
        (0, 33, -3.5),
        (7.896446609, 33, -2.896446609),
        (8.5, 33, -1.146446609),
        (8.25, 32.5, -3.25),
        (0, 32.5, -4),
        (-8.25, 32.5, -3.25),
        (-9, 32.5, -1.25),
    ]]
    fillet(fillet6_edges, radius=FILLET6_R)

    # Chamfer5
    chamfer5_edges = [body_2.edges().sort_by_distance(p)[0] for p in [
        (7.5, 23.681534086, -3),
        (-7.5, 23.681534086, -3),
    ]]
    chamfer(chamfer5_edges, length=CHAMFER5_SIZE)

    # Fillet7
    fillet7_edges = [body_2.edges().sort_by_distance(p)[0] for p in [
        (6, 23.985281374, -3),
        (-6, 23.985281374, -3),
        (7.5, 23.681534086, -1.5),
        (-7.5, 23.681534086, -1.5),
    ]]
    fillet(fillet7_edges, radius=FILLET7_R)

    # Fillet8
    fillet8_edges = [body_2.edges().sort_by_distance(p)[0] for p in [
        (0, 31, -4),
        (-9, 31, -1.25),
        (9, 31, -1.25),
        (8.25, 31, -3.25),
        (-8.25, 31, -3.25),
    ]]
    fillet(fillet8_edges, radius=FILLET8_R)


solid = Compound([part.part, body_2.part])
